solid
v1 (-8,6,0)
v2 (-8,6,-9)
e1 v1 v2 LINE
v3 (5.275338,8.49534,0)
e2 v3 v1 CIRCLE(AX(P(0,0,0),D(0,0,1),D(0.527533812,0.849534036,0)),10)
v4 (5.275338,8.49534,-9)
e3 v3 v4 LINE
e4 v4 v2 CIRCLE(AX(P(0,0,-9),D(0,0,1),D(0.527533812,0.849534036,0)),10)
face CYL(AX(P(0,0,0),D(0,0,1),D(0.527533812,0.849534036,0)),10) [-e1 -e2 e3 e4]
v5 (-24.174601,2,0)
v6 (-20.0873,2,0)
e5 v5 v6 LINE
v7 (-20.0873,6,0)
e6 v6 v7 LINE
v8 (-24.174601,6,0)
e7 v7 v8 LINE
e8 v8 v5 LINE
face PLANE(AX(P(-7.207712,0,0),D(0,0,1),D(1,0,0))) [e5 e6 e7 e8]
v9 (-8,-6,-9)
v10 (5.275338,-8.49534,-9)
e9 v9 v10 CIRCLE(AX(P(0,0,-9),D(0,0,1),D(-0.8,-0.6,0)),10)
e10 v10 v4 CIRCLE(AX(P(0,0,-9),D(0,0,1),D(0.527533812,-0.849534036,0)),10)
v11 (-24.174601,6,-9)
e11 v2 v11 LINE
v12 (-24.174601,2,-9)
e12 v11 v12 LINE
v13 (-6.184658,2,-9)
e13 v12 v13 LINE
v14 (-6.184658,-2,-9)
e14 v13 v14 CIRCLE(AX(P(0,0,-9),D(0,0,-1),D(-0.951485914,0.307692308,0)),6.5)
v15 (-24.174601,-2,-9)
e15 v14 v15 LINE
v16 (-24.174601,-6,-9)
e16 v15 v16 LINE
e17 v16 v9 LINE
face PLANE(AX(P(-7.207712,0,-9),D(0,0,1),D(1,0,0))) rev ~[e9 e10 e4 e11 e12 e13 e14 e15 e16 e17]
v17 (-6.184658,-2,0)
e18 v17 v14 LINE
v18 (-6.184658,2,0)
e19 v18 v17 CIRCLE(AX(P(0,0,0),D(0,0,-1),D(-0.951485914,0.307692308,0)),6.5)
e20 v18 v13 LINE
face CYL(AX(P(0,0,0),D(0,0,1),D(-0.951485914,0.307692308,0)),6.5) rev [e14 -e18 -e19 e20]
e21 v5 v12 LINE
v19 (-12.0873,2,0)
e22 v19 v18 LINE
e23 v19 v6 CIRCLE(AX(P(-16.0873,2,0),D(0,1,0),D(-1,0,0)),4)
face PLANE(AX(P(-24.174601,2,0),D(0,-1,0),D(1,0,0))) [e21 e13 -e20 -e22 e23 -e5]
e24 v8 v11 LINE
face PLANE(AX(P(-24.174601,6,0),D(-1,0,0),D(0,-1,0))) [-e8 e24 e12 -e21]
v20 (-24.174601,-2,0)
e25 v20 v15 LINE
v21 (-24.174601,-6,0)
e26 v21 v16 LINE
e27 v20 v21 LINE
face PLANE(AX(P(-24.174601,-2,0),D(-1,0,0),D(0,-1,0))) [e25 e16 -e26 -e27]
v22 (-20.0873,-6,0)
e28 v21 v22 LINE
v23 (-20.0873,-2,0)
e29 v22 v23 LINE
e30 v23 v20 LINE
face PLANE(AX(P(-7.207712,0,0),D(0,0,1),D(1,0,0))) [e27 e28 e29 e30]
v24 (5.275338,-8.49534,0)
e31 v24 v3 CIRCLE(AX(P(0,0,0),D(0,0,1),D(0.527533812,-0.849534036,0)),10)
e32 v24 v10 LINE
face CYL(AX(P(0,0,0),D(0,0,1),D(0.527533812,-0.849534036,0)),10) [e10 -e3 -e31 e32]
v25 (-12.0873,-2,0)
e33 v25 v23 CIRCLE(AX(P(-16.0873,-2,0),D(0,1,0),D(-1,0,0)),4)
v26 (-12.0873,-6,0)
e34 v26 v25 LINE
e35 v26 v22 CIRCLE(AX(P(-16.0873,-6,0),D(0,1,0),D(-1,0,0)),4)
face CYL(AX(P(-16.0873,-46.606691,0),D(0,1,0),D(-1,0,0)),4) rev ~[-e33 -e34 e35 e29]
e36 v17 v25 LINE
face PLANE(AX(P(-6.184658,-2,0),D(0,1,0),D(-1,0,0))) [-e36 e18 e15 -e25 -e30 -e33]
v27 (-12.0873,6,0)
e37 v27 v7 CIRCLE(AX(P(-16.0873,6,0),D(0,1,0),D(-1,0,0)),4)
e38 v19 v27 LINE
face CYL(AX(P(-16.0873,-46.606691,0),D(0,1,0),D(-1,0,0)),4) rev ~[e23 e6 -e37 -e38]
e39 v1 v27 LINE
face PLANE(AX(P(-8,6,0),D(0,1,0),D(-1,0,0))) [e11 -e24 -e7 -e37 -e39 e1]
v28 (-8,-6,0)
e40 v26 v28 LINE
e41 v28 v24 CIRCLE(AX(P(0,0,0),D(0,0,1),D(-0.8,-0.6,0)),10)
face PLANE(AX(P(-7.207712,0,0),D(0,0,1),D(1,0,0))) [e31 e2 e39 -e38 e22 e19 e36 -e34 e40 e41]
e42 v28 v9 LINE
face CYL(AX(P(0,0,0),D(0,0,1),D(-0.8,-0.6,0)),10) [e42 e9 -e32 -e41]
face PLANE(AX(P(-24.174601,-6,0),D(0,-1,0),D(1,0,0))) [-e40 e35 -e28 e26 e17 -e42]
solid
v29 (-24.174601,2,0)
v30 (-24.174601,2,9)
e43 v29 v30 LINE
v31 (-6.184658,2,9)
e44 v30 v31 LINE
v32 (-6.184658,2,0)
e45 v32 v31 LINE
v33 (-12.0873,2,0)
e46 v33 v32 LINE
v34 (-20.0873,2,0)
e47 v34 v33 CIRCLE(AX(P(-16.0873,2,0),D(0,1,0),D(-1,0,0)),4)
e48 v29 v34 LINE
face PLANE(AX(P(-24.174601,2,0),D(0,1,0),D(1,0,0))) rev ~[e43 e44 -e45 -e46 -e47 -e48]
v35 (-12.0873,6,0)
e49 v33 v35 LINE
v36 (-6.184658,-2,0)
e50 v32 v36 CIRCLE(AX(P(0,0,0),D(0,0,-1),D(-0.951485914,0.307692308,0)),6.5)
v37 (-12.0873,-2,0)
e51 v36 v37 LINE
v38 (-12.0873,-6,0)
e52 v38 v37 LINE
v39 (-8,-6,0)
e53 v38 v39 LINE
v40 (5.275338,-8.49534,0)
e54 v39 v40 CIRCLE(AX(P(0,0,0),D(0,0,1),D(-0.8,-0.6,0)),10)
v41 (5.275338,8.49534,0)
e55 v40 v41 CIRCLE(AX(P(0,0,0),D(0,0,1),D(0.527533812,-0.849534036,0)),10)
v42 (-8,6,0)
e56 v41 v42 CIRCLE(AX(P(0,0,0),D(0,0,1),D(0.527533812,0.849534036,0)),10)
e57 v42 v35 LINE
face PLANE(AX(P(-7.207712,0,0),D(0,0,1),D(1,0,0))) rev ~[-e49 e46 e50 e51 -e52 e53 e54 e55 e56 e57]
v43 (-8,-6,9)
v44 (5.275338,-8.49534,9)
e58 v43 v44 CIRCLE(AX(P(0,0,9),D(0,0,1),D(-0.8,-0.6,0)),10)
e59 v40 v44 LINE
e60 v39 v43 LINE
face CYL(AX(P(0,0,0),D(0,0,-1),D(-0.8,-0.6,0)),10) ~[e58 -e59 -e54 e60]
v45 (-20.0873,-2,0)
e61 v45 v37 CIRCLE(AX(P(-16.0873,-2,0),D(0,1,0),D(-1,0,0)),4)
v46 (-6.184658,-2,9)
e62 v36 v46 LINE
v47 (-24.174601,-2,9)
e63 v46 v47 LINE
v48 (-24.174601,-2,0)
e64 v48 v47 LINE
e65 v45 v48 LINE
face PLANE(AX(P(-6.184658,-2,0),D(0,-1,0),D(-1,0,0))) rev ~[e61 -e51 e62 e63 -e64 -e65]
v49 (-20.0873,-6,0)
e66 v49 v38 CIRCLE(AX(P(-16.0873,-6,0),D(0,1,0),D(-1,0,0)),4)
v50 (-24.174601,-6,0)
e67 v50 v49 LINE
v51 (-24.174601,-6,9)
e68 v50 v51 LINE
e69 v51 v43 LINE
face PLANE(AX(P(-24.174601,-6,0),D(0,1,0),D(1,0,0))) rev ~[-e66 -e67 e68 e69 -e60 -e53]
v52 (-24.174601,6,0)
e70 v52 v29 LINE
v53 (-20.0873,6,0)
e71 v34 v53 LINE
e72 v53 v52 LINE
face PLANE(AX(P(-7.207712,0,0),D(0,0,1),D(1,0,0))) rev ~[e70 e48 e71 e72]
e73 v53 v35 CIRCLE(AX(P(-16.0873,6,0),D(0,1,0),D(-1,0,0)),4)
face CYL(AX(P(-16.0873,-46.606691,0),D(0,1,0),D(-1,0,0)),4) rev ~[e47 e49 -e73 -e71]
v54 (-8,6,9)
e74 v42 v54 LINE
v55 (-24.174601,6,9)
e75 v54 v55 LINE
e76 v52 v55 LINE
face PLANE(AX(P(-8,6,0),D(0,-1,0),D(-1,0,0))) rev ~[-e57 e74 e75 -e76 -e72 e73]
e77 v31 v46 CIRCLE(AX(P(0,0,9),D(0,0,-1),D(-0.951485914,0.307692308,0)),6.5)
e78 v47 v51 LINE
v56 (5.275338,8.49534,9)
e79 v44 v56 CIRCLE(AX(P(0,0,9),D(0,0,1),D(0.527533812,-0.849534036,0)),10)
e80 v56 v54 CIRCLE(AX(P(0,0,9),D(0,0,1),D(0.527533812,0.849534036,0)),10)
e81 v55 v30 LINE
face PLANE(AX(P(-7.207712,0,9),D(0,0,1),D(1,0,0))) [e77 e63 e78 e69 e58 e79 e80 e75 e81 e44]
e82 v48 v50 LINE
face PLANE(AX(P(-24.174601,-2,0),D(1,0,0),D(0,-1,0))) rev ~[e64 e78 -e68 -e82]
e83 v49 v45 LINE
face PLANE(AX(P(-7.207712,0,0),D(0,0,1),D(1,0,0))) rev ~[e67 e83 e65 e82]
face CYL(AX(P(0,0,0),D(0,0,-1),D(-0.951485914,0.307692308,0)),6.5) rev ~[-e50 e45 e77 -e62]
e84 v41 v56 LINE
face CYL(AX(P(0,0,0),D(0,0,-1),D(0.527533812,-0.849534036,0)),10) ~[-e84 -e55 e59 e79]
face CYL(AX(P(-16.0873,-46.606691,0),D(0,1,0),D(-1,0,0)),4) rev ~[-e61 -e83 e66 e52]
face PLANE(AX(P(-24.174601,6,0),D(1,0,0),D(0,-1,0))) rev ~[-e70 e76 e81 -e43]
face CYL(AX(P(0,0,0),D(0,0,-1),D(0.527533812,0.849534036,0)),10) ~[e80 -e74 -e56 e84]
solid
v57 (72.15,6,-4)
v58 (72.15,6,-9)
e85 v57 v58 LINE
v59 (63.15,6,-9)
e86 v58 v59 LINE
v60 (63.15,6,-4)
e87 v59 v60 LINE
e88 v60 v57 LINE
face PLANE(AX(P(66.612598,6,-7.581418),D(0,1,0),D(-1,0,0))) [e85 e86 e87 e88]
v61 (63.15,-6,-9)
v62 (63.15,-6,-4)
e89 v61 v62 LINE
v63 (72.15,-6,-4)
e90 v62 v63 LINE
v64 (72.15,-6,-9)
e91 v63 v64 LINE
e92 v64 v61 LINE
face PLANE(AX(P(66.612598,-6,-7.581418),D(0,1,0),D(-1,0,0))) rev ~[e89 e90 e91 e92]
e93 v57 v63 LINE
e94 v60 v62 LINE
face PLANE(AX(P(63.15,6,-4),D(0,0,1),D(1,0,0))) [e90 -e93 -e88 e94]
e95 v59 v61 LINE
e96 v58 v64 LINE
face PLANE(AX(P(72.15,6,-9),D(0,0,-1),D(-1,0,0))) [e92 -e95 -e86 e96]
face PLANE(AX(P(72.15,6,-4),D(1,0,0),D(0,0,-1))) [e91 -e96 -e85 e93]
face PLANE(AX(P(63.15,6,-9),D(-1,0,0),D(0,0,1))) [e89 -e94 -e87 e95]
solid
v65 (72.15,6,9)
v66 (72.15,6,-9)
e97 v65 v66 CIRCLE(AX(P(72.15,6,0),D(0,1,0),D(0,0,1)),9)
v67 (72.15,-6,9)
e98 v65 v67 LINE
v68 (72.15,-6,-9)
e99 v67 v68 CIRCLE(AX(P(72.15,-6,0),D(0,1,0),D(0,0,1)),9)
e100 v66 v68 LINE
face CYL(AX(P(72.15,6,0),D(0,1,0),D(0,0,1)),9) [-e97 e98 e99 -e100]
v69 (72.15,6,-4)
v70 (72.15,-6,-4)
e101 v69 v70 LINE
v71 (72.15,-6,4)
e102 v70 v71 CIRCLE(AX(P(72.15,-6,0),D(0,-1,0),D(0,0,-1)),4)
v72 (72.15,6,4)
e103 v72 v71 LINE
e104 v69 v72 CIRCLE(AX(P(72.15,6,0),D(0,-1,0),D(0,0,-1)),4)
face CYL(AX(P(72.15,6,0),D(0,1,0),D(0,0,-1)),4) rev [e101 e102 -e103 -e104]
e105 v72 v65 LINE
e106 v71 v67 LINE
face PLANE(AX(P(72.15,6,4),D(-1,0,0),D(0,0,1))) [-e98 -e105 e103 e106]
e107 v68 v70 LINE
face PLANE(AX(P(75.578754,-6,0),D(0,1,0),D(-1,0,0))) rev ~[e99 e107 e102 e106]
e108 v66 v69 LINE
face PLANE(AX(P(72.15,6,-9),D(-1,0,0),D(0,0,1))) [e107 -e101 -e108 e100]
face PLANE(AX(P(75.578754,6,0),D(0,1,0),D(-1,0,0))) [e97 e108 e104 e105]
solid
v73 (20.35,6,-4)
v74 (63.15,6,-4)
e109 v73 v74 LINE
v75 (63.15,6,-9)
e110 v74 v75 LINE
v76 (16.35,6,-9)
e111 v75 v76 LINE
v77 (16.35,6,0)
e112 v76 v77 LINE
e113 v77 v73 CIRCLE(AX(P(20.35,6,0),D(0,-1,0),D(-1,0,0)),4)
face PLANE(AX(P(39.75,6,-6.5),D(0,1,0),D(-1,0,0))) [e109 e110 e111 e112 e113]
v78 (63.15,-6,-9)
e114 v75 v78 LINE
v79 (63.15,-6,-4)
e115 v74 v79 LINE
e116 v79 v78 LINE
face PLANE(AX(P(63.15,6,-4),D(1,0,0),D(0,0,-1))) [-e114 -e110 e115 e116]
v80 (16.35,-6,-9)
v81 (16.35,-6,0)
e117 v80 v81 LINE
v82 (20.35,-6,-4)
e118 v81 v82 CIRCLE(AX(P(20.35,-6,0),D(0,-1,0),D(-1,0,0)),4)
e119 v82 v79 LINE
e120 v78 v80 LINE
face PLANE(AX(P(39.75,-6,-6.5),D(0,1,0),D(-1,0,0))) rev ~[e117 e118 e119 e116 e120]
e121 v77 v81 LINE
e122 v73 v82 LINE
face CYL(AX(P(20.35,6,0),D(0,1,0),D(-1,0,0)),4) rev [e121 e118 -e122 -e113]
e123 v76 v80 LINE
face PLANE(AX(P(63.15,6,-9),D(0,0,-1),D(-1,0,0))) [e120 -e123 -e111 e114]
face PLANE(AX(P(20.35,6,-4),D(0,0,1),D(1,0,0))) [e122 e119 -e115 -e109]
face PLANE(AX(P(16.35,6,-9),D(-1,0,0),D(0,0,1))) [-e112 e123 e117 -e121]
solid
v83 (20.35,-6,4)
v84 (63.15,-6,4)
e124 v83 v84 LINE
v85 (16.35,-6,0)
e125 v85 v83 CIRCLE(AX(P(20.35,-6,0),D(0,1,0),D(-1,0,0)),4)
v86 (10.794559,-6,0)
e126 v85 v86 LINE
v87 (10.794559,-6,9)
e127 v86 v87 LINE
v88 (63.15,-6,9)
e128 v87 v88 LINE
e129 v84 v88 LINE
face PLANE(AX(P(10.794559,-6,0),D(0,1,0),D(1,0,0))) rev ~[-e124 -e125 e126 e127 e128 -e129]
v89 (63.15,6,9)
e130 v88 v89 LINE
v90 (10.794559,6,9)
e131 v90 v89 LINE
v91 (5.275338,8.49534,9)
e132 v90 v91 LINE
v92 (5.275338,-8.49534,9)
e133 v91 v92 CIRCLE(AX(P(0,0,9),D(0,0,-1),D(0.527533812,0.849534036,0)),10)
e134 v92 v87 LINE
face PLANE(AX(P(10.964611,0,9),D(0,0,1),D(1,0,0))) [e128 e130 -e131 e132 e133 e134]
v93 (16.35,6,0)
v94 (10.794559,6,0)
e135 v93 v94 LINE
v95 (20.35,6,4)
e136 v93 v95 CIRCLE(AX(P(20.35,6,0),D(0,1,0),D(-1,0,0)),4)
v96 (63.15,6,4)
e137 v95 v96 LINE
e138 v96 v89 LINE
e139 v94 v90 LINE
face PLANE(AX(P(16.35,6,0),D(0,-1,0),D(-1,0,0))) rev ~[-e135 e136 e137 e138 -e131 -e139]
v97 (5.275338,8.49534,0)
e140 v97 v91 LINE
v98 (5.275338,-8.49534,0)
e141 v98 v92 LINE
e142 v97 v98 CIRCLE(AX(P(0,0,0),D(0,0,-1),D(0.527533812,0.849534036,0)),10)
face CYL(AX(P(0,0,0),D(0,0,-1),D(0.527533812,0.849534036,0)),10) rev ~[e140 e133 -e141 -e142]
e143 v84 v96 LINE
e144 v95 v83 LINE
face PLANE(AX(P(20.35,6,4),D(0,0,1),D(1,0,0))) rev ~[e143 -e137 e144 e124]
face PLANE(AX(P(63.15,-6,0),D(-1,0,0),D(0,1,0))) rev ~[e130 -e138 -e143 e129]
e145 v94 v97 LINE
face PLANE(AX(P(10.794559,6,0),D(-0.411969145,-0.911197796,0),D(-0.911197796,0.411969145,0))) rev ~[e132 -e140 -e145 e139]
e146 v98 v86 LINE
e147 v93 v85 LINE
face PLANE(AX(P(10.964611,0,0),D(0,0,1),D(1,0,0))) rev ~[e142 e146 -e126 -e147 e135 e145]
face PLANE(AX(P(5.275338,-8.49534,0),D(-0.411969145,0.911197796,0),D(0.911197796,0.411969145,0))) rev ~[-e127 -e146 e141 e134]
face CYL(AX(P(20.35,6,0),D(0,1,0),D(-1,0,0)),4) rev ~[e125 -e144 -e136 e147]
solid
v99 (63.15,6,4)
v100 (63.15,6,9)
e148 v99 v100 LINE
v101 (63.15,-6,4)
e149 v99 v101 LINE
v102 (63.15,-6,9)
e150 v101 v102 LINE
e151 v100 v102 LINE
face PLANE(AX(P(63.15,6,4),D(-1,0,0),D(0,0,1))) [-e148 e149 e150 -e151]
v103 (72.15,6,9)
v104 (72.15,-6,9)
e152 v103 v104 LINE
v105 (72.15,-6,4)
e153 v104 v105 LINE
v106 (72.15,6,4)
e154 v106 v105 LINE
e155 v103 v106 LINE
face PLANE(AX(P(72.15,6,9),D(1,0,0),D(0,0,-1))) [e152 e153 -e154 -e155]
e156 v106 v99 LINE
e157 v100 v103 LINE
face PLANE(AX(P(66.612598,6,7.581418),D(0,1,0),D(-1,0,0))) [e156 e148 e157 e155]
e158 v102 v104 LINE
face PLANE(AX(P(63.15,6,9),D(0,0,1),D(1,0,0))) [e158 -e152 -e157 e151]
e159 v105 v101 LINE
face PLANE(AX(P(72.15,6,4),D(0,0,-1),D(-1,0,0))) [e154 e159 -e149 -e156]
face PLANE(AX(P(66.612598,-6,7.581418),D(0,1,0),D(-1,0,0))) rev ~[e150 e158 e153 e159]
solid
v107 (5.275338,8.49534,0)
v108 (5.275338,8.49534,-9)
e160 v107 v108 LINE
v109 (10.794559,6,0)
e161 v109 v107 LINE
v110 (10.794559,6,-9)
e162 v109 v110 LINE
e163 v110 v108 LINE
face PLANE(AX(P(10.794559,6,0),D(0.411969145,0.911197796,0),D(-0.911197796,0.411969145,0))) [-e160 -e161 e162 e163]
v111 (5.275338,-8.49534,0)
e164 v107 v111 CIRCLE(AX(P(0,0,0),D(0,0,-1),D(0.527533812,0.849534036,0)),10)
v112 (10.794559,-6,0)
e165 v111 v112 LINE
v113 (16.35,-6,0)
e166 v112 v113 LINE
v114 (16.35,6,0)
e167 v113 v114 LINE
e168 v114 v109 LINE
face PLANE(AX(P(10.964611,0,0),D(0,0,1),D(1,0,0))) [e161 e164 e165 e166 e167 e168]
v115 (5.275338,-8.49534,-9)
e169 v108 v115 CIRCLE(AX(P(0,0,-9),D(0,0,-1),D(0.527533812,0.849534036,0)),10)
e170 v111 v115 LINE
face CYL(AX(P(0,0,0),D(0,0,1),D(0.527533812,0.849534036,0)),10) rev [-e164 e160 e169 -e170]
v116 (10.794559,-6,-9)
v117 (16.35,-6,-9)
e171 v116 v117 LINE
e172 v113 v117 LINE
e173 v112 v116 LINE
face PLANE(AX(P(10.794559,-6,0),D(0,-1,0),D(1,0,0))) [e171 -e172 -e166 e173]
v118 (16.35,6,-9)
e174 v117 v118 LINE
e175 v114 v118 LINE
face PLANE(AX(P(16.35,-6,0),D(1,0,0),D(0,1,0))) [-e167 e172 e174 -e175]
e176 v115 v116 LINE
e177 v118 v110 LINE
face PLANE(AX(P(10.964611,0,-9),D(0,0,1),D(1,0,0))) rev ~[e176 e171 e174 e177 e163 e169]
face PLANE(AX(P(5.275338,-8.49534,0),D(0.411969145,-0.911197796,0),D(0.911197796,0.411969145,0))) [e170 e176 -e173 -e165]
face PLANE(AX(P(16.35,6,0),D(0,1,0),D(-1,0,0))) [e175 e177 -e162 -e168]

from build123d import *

# Parameters (mm, degrees)
F1_DEPTH  = 9
F2_DEPTH  = 9
F4_DEPTH  = 9
F5_DEPTH  = 9
F6_DEPTH  = 9
F8_D      = 8
F8_2_D    = 8
F3_W      = 42.8
F3_H      = 4
F9_DEPTH  = 25
F10_DEPTH = 12
F11_DEPTH = 12
F12_DEPTH = 12


# Not quite as in the source:
# - a feature names something its author has since deleted; it is built from what else it names


with BuildPart() as f1:
    # F0 (on Top) → F1 (new body)
    with BuildSketch(Plane.XY):
        with BuildLine():
            ThreePointArc((5.2753381173, -8.4953403551), (10, 0), (5.2753381173, 8.4953403551))
            ThreePointArc((5.2753381173, 8.4953403551), (-1.8473295498, 9.8278875418), (-8, 6))
            Line((-8, 6), (-24.1746007293, 6))
            Line((-24.1746007293, 6), (-24.1746007293, 2))
            Line((-24.1746007293, 2), (-8.1069414701, 2))
            Line((-8.1069414701, 2), (-6.1846584384, 2))
            ThreePointArc((-6.1846584384, 2), (6.5, 0), (-6.1846584384, -2))
            Line((-6.1846584384, -2), (-8.1069414701, -2))
            Line((-8.1069414701, -2), (-24.1746007293, -2))
            Line((-24.1746007293, -2), (-24.1746007293, -6))
            Line((-24.1746007293, -6), (-8, -6))
            ThreePointArc((-8, -6), (-1.8473295498, -9.8278875418), (5.2753381173, -8.4953403551))
        make_face()
    extrude(amount=F1_DEPTH)

    # F8 (through all)
    with Locations(Plane.XZ.offset(6)):
        with Locations((-16.0873003646, 0)):
            Hole(F8_D / 2)


with BuildPart() as f2:
    # F0 (on Top) → F2 (new body)
    with BuildSketch(Plane.XY):
        Polygon((63.15, 0), (16.35, 0), (16.35, -6), (62.2006830499, -6), (63.15, -6), (63.15, -5.0506830499), (63.15, -3.4493169501), (63.15, -2.5), align=None)
        Polygon((16.35, 6), (16.35, 0), (63.15, 0), (63.15, 2.5), (63.15, 3.4493169501), (63.15, 5.0506830499), (63.15, 6), (62.2006830499, 6), align=None)
    extrude(amount=F2_DEPTH)

    # F0 (on Top) → F4 (join)
    with BuildSketch(Plane.XY):
        with BuildLine():
            Line((16.35, -6), (16.35, 0))
            Line((16.35, 0), (16.35, 6))
            Line((16.35, 6), (10.7945588145, 6))
            Line((10.7945588145, 6), (5.2753381173, 8.4953403551))
            ThreePointArc((5.2753381173, 8.4953403551), (10, 0), (5.2753381173, -8.4953403551))
            Line((5.2753381173, -8.4953403551), (10.7945588145, -6))
            Line((10.7945588145, -6), (16.35, -6))
        make_face()
    extrude(amount=F4_DEPTH)

    # F3 (on face) → F9 (cut)
    with BuildSketch(Plane(origin=(0, 6, 0), x_dir=(-1, 0, 0), z_dir=(0, 1, 0))):
        with Locations((-41.75, 2)):
            Rectangle(F3_W, F3_H)
        Polygon((-20.35, 0), (-63.15, 0), (-63.15, -4), (-42.4068458378, -4), (-20.35, -4), align=None)
        with BuildLine():
            Line((-16.35, 0), (-20.35, 0))
            Line((-20.35, 0), (-20.35, -4))
            ThreePointArc((-20.35, -4), (-17.5215728753, -2.8284271247), (-16.35, 0))
        make_face()
        with BuildLine():
            Line((-20.35, 4), (-20.35, 0))
            Line((-20.35, 0), (-16.35, 0))
            ThreePointArc((-16.35, 0), (-17.5215728753, 2.8284271247), (-20.35, 4))
        make_face()
        with BuildLine():
            Line((-68.15, 0), (-63.15, 0))
            ThreePointArc((-63.15, 0), (-63.3875711206, 2.0542249469), (-64.0877422517, 4))
            Line((-64.0877422517, 4), (-72.15, 4))
            ThreePointArc((-72.15, 4), (-69.3215728753, 2.8284271247), (-68.15, 0))
        make_face()
        with BuildLine():
            ThreePointArc((-64.0877422517, -4), (-63.3875711206, -2.0542249469), (-63.15, 0))
            Line((-63.15, 0), (-68.15, 0))
            ThreePointArc((-68.15, 0), (-69.3215728753, -2.8284271247), (-72.15, -4))
            Line((-72.15, -4), (-64.0877422517, -4))
        make_face()
        with BuildLine():
            ThreePointArc((-64.0877422517, 4), (-63.3875711206, 2.0542249469), (-63.15, 0))
            Line((-63.15, 0), (-63.15, 4))
            Line((-63.15, 4), (-64.0877422517, 4))
        make_face()
        with BuildLine():
            Line((-63.15, -4), (-63.15, 0))
            ThreePointArc((-63.15, 0), (-63.3875711206, -2.0542249469), (-64.0877422517, -4))
            Line((-64.0877422517, -4), (-63.15, -4))
        make_face()
        with BuildLine():
            Line((-72.15, 0), (-68.15, 0))
            ThreePointArc((-68.15, 0), (-69.3215728753, 2.8284271247), (-72.15, 4))
            Line((-72.15, 4), (-72.15, 0))
        make_face()
        with BuildLine():
            ThreePointArc((-72.15, -4), (-69.3215728753, -2.8284271247), (-68.15, 0))
            Line((-68.15, 0), (-72.15, 0))
            Line((-72.15, 0), (-72.15, -4))
        make_face()
        with BuildLine():
            Line((-72.15, -4), (-72.15, 0))
            Line((-72.15, 0), (-72.15, 4))
            ThreePointArc((-72.15, 4), (-76.15, 0), (-72.15, -4))
        make_face()
    extrude(amount=-F9_DEPTH, mode=Mode.SUBTRACT)


with BuildPart() as f5:
    # F0 (on Top) → F5 (new body)
    with BuildSketch(Plane.XY):
        with BuildLine():
            Line((16.35, -6), (16.35, 0))
            Line((16.35, 0), (16.35, 6))
            Line((16.35, 6), (10.7945588145, 6))
            Line((10.7945588145, 6), (5.2753381173, 8.4953403551))
            ThreePointArc((5.2753381173, 8.4953403551), (10, 0), (5.2753381173, -8.4953403551))
            Line((5.2753381173, -8.4953403551), (10.7945588145, -6))
            Line((10.7945588145, -6), (16.35, -6))
        make_face()
    extrude(amount=-F5_DEPTH)


with BuildPart() as f6:
    # F0 (on Top) → F6 (new body)
    with BuildSketch(Plane.XY):
        with BuildLine():
            ThreePointArc((5.2753381173, -8.4953403551), (10, 0), (5.2753381173, 8.4953403551))
            ThreePointArc((5.2753381173, 8.4953403551), (-1.8473295498, 9.8278875418), (-8, 6))
            Line((-8, 6), (-24.1746007293, 6))
            Line((-24.1746007293, 6), (-24.1746007293, 2))
            Line((-24.1746007293, 2), (-8.1069414701, 2))
            Line((-8.1069414701, 2), (-6.1846584384, 2))
            ThreePointArc((-6.1846584384, 2), (6.5, 0), (-6.1846584384, -2))
            Line((-6.1846584384, -2), (-8.1069414701, -2))
            Line((-8.1069414701, -2), (-24.1746007293, -2))
            Line((-24.1746007293, -2), (-24.1746007293, -6))
            Line((-24.1746007293, -6), (-8, -6))
            ThreePointArc((-8, -6), (-1.8473295498, -9.8278875418), (5.2753381173, -8.4953403551))
        make_face()
    extrude(amount=-F6_DEPTH)

    # F8#2 (through all)
    with Locations(Plane.XZ.offset(6)):
        with Locations((-16.0873003646, 0)):
            Hole(F8_2_D / 2)


with BuildPart() as f10:
    # F3 (on face) → F10 (new body)
    with BuildSketch(Plane(origin=(0, 6, 0), x_dir=(-1, 0, 0), z_dir=(0, 1, 0))):
        with BuildLine():
            ThreePointArc((-72.15, 9), (-67.4065835097, 7.6485292704), (-64.0877422517, 4))
            Line((-64.0877422517, 4), (-63.15, 4))
            Line((-63.15, 4), (-63.15, 9))
            Line((-63.15, 9), (-72.15, 9))
        make_face()
        with BuildLine():
            Line((-72.15, 4), (-64.0877422517, 4))
            ThreePointArc((-64.0877422517, 4), (-67.4065835097, 7.6485292704), (-72.15, 9))
            Line((-72.15, 9), (-72.15, 4))
        make_face()
    extrude(amount=-F10_DEPTH)


with BuildPart() as f10b:
    # F3 (on face) → F10, piece 2 (new body)
    with BuildSketch(Plane(origin=(0, 6, 0), x_dir=(-1, 0, 0), z_dir=(0, 1, 0))):
        with BuildLine():
            Line((-63.15, -4), (-64.0877422517, -4))
            ThreePointArc((-64.0877422517, -4), (-67.4065835097, -7.6485292704), (-72.15, -9))
            Line((-72.15, -9), (-63.15, -9))
            Line((-63.15, -9), (-63.15, -4))
        make_face()
        with BuildLine():
            ThreePointArc((-72.15, -9), (-67.4065835097, -7.6485292704), (-64.0877422517, -4))
            Line((-64.0877422517, -4), (-72.15, -4))
            Line((-72.15, -4), (-72.15, -9))
        make_face()
    extrude(amount=-F10_DEPTH)


with BuildPart() as f11:
    # F3 (on face) → F11 (new body)
    with BuildSketch(Plane(origin=(0, 6, 0), x_dir=(-1, 0, 0), z_dir=(0, 1, 0))):
        Polygon((-42.4068458378, -4), (-63.15, -4), (-63.15, -9), (-16.35, -9), (-16.35, -4), (-20.35, -4), align=None)
        with BuildLine():
            Line((-16.35, -4), (-16.35, 0))
            ThreePointArc((-16.35, 0), (-17.5215728753, -2.8284271247), (-20.35, -4))
            Line((-20.35, -4), (-16.35, -4))
        make_face()
    extrude(amount=-F11_DEPTH)


with BuildPart() as f12:
    # F3 (on face) → F12 (new body)
    with BuildSketch(Plane(origin=(0, 6, 0), x_dir=(-1, 0, 0), z_dir=(0, 1, 0))):
        with BuildLine():
            ThreePointArc((-72.15, -4), (-76.15, 0), (-72.15, 4))
            Line((-72.15, 4), (-72.15, 9))
            ThreePointArc((-72.15, 9), (-81.15, 0), (-72.15, -9))
            Line((-72.15, -9), (-72.15, -4))
        make_face()
    extrude(amount=-F12_DEPTH)


solid = Compound([f1.part, f2.part, f5.part, f6.part, f10.part, f10b.part, f11.part, f12.part])
